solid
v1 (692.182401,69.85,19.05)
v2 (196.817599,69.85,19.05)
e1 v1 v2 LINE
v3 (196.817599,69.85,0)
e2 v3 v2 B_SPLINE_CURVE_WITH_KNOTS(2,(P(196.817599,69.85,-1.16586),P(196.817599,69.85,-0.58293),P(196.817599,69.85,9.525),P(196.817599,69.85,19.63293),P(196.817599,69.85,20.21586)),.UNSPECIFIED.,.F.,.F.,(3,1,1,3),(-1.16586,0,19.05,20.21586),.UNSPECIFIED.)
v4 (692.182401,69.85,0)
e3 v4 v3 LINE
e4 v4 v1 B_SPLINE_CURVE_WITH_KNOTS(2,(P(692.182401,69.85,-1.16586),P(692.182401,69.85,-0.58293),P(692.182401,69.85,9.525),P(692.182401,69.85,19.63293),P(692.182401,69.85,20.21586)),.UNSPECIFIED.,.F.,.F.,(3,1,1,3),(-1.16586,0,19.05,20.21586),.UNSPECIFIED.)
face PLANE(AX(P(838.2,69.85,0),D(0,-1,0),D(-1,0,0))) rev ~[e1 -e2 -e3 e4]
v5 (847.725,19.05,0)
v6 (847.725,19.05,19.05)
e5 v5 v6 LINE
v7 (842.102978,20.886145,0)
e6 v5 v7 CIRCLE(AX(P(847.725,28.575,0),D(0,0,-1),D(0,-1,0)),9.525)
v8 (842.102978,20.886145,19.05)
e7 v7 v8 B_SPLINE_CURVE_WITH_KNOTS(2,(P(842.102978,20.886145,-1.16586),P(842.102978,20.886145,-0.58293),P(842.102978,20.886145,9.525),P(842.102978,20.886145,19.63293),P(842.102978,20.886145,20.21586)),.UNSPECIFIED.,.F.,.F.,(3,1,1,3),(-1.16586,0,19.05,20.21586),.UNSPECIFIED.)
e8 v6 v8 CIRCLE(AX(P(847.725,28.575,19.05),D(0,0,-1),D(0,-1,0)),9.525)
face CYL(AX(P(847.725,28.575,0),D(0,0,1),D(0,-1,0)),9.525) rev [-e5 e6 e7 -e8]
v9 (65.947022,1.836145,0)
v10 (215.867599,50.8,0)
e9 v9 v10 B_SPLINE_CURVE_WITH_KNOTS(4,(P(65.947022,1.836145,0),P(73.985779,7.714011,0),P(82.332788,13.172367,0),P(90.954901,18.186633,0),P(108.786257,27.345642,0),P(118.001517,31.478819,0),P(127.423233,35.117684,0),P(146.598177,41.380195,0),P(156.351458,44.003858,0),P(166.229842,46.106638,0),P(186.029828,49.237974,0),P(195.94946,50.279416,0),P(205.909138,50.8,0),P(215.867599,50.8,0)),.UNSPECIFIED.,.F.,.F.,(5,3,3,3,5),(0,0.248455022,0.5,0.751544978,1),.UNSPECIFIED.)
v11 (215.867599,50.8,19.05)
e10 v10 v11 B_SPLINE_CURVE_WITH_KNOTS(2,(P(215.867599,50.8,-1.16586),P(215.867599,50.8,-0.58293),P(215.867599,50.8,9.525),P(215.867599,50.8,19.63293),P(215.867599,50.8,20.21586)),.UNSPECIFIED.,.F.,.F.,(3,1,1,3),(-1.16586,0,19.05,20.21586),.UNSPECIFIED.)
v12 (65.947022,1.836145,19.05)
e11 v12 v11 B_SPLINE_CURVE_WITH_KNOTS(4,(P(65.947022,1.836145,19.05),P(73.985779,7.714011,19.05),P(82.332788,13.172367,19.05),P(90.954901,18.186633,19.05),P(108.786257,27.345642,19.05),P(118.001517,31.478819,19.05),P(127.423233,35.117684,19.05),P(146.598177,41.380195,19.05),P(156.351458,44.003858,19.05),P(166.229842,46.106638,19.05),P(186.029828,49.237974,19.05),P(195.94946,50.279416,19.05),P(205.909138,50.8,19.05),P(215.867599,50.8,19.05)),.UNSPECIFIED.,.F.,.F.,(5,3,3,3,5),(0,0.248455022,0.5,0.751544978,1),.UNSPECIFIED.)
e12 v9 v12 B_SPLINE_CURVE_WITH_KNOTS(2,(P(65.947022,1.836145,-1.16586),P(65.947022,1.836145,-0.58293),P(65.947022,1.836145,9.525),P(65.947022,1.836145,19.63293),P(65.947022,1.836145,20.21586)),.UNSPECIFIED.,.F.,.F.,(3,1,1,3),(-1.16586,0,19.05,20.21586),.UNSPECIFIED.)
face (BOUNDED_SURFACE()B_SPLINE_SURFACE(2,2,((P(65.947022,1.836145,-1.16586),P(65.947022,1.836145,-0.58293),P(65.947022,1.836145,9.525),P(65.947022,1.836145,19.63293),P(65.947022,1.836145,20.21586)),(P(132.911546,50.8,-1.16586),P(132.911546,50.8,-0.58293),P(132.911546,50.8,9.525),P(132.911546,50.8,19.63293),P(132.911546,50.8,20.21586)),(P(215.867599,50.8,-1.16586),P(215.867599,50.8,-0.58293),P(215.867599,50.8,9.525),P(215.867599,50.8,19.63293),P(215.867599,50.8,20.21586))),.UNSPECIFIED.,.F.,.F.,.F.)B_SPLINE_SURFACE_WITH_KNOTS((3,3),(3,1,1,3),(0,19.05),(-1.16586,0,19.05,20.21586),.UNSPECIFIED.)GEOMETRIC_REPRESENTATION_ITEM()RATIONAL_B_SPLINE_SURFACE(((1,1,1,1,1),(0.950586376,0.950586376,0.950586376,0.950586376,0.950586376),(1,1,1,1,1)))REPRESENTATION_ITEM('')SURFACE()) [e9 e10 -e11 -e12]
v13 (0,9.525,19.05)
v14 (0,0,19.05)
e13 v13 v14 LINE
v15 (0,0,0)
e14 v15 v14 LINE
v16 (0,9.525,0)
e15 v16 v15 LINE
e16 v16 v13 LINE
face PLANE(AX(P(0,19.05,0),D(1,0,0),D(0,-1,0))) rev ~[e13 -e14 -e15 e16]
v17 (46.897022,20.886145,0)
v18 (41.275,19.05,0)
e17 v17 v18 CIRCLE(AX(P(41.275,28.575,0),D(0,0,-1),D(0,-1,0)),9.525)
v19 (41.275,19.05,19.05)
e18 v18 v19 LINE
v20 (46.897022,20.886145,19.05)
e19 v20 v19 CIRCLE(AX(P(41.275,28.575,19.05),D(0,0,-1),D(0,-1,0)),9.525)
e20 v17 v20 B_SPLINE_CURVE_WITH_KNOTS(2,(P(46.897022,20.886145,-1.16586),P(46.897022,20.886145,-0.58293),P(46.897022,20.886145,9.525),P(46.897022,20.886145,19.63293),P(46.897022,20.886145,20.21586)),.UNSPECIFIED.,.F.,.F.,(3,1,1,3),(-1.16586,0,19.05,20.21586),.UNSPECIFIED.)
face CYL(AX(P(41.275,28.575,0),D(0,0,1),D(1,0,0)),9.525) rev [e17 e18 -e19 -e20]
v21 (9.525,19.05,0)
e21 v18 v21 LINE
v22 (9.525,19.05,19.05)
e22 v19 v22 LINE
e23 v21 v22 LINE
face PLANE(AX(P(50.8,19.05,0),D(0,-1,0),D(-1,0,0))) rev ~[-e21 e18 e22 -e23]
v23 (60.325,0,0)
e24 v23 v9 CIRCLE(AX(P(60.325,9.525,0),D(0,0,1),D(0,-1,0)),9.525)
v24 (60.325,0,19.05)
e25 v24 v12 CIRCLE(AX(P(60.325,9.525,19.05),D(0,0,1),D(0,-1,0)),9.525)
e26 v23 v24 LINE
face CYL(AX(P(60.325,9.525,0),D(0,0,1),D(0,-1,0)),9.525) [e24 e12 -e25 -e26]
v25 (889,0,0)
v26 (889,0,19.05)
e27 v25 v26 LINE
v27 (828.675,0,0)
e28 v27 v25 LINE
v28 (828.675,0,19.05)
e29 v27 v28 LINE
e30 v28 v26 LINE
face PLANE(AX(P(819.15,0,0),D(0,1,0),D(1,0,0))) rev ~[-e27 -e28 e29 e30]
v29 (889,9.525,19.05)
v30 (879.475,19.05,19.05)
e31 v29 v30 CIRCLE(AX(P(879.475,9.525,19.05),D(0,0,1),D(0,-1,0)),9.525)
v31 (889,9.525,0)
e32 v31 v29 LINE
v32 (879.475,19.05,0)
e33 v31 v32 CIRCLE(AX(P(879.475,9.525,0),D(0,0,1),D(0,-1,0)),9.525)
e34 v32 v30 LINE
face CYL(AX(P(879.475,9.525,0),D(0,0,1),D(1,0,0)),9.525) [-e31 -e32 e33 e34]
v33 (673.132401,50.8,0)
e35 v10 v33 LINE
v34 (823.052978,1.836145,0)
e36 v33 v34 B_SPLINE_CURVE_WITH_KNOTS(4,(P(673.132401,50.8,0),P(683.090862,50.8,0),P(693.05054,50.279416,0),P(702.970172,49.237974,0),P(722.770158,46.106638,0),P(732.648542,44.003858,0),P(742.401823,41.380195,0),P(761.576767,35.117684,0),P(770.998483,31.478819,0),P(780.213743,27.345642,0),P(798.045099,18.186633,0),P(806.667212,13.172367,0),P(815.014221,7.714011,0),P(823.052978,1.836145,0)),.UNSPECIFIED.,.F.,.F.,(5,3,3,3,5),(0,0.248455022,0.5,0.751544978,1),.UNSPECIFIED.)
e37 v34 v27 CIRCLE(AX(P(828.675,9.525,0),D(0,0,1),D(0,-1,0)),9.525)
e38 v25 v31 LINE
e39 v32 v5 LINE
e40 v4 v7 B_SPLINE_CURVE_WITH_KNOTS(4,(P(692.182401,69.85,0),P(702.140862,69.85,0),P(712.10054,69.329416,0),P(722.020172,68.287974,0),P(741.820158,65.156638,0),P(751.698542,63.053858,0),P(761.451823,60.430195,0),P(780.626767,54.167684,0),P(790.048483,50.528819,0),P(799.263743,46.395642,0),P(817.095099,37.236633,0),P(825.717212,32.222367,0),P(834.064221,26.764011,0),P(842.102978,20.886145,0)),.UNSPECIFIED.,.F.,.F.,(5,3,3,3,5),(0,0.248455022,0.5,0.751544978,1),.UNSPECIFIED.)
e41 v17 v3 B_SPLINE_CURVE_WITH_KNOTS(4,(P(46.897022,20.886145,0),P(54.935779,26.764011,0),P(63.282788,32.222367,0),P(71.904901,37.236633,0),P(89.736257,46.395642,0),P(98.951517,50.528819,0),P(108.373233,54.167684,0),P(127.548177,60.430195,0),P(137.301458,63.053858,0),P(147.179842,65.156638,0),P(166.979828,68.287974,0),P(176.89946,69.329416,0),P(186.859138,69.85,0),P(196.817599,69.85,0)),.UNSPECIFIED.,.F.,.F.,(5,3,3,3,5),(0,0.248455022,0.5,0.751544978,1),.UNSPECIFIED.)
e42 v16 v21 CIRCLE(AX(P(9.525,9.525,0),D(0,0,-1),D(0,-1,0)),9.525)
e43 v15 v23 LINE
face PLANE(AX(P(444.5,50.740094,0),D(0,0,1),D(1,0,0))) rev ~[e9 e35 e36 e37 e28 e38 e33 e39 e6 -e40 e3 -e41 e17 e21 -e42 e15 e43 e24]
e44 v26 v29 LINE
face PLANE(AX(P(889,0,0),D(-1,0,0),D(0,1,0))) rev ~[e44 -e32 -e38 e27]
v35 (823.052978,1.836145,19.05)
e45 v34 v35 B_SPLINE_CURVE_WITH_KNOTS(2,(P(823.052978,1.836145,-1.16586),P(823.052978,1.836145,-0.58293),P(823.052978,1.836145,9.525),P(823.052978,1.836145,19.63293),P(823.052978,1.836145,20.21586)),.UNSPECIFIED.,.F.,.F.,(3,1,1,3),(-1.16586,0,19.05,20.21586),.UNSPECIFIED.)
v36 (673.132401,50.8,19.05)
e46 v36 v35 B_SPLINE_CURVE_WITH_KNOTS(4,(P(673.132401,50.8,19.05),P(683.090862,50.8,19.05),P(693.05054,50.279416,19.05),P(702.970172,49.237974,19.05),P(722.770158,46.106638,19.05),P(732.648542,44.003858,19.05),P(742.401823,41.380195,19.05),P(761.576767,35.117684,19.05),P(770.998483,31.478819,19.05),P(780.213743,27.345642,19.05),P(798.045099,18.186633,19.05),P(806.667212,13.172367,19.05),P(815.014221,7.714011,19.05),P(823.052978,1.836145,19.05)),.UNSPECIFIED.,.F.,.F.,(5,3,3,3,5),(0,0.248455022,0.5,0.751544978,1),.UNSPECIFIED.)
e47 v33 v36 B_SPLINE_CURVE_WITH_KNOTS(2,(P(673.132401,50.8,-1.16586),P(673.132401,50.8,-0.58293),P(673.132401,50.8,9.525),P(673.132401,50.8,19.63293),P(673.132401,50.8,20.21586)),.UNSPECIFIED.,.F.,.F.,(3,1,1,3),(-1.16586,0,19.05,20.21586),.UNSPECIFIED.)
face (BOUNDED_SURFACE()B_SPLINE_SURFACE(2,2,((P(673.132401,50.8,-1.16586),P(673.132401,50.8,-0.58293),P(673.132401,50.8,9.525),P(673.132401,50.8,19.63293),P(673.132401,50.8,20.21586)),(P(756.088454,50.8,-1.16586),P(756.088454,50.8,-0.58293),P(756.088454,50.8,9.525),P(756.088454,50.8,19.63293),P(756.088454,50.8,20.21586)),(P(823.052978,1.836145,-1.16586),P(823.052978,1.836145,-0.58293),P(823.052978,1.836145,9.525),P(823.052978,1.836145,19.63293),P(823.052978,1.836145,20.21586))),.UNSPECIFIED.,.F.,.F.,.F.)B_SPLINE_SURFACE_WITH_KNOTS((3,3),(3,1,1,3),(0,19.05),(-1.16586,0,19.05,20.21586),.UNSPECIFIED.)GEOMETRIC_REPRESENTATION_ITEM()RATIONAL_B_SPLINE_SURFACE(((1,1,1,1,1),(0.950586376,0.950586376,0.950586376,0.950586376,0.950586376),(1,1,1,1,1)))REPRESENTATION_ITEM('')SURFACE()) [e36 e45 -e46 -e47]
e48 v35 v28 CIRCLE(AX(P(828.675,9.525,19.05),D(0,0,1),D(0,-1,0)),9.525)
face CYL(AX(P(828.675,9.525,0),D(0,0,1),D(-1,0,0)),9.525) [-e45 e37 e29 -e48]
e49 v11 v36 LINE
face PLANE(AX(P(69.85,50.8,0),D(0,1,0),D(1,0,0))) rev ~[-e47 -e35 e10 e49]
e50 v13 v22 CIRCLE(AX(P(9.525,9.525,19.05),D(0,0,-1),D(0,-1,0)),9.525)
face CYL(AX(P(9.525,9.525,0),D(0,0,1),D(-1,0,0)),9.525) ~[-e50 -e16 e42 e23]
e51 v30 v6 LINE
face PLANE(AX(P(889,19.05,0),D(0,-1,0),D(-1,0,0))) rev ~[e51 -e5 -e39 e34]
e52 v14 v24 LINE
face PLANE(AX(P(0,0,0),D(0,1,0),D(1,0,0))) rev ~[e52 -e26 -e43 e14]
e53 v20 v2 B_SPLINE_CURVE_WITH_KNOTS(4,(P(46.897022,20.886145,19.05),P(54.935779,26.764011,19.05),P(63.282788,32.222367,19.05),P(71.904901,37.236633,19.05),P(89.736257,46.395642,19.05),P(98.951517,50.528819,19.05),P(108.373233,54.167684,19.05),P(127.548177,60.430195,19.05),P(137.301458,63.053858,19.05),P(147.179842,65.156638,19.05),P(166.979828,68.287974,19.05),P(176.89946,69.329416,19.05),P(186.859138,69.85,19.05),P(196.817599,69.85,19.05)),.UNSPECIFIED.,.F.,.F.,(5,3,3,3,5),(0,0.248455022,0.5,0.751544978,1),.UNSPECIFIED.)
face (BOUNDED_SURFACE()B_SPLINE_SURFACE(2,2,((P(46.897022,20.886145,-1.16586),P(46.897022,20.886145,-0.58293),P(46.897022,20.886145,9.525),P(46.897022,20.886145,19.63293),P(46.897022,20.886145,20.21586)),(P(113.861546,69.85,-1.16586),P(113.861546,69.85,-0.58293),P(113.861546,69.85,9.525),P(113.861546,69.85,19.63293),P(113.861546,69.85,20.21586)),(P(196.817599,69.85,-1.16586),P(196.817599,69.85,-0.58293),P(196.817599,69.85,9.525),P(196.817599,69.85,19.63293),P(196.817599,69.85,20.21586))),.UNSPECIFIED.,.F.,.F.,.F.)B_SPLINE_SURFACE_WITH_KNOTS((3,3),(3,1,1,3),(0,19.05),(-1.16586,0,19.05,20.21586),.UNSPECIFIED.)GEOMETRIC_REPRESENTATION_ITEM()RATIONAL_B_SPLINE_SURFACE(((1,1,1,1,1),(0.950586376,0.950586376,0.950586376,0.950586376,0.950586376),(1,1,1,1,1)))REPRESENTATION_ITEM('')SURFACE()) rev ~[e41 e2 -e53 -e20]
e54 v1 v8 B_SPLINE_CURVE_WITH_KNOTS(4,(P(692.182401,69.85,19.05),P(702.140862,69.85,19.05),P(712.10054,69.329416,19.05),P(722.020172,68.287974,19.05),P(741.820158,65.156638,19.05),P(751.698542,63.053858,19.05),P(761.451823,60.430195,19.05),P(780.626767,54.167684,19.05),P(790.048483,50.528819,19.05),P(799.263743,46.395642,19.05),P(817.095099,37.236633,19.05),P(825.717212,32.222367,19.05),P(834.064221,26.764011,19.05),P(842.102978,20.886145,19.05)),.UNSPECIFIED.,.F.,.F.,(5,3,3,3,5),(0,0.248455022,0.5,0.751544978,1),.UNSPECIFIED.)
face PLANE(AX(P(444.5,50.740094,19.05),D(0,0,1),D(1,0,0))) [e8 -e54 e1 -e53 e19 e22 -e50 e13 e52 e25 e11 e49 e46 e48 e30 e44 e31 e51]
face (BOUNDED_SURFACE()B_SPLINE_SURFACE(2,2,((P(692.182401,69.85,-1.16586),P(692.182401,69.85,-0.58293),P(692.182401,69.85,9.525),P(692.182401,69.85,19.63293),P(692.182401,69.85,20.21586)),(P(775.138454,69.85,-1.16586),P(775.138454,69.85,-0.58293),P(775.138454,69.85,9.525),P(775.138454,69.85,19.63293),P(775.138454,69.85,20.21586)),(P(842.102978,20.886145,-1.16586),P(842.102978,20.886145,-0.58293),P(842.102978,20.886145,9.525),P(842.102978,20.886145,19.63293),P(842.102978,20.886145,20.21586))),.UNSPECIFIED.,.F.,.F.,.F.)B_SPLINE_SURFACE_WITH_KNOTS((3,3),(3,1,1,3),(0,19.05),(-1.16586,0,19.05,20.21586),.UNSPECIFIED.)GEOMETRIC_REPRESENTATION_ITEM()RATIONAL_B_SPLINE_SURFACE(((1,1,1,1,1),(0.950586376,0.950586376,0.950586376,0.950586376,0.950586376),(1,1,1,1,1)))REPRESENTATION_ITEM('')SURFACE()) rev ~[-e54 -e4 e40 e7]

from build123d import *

# Parameters (mm, degrees)
F3_DEPTH = 19.05
F4_R     = 9.525
F5_R     = 254


# Not quite as in the source:
# - a variable given as a bare number and used for a length is read in inches; the dataset says mm whatever the document's units were


with BuildPart() as f3:
    # F2 (on Top) → F3 (new body)
    with BuildSketch(Plane.XY):
        Polygon((0, 19.05), (0, 0), (69.85, 0), (69.85, 50.8), (444.5, 50.8), (819.15, 50.8), (819.15, 0), (889, 0), (889, 19.05), (838.2, 19.05), (838.2, 69.85), (444.5, 69.85), (50.8, 69.85), (50.8, 19.05), align=None)
    extrude(amount=F3_DEPTH)

    # F4
    f4_edges = [f3.edges().sort_by_distance(p)[0] for p in [
        (69.85, 0, 9.525),
        (50.8, 19.05, 9.525),
        (819.15, 0, 9.525),
        (838.2, 19.05, 9.525),
        (0, 19.05, 9.525),
        (889, 19.05, 9.525),
    ]]
    fillet(f4_edges, radius=F4_R)

    # F5
    f5_edges = [f3.edges().sort_by_distance(p)[0] for p in [
        (69.85, 50.8, 9.525),
        (50.8, 69.85, 9.525),
        (819.15, 50.8, 9.525),
        (838.2, 69.85, 9.525),
    ]]
    fillet(f5_edges, radius=F5_R)


solid = f3.part
